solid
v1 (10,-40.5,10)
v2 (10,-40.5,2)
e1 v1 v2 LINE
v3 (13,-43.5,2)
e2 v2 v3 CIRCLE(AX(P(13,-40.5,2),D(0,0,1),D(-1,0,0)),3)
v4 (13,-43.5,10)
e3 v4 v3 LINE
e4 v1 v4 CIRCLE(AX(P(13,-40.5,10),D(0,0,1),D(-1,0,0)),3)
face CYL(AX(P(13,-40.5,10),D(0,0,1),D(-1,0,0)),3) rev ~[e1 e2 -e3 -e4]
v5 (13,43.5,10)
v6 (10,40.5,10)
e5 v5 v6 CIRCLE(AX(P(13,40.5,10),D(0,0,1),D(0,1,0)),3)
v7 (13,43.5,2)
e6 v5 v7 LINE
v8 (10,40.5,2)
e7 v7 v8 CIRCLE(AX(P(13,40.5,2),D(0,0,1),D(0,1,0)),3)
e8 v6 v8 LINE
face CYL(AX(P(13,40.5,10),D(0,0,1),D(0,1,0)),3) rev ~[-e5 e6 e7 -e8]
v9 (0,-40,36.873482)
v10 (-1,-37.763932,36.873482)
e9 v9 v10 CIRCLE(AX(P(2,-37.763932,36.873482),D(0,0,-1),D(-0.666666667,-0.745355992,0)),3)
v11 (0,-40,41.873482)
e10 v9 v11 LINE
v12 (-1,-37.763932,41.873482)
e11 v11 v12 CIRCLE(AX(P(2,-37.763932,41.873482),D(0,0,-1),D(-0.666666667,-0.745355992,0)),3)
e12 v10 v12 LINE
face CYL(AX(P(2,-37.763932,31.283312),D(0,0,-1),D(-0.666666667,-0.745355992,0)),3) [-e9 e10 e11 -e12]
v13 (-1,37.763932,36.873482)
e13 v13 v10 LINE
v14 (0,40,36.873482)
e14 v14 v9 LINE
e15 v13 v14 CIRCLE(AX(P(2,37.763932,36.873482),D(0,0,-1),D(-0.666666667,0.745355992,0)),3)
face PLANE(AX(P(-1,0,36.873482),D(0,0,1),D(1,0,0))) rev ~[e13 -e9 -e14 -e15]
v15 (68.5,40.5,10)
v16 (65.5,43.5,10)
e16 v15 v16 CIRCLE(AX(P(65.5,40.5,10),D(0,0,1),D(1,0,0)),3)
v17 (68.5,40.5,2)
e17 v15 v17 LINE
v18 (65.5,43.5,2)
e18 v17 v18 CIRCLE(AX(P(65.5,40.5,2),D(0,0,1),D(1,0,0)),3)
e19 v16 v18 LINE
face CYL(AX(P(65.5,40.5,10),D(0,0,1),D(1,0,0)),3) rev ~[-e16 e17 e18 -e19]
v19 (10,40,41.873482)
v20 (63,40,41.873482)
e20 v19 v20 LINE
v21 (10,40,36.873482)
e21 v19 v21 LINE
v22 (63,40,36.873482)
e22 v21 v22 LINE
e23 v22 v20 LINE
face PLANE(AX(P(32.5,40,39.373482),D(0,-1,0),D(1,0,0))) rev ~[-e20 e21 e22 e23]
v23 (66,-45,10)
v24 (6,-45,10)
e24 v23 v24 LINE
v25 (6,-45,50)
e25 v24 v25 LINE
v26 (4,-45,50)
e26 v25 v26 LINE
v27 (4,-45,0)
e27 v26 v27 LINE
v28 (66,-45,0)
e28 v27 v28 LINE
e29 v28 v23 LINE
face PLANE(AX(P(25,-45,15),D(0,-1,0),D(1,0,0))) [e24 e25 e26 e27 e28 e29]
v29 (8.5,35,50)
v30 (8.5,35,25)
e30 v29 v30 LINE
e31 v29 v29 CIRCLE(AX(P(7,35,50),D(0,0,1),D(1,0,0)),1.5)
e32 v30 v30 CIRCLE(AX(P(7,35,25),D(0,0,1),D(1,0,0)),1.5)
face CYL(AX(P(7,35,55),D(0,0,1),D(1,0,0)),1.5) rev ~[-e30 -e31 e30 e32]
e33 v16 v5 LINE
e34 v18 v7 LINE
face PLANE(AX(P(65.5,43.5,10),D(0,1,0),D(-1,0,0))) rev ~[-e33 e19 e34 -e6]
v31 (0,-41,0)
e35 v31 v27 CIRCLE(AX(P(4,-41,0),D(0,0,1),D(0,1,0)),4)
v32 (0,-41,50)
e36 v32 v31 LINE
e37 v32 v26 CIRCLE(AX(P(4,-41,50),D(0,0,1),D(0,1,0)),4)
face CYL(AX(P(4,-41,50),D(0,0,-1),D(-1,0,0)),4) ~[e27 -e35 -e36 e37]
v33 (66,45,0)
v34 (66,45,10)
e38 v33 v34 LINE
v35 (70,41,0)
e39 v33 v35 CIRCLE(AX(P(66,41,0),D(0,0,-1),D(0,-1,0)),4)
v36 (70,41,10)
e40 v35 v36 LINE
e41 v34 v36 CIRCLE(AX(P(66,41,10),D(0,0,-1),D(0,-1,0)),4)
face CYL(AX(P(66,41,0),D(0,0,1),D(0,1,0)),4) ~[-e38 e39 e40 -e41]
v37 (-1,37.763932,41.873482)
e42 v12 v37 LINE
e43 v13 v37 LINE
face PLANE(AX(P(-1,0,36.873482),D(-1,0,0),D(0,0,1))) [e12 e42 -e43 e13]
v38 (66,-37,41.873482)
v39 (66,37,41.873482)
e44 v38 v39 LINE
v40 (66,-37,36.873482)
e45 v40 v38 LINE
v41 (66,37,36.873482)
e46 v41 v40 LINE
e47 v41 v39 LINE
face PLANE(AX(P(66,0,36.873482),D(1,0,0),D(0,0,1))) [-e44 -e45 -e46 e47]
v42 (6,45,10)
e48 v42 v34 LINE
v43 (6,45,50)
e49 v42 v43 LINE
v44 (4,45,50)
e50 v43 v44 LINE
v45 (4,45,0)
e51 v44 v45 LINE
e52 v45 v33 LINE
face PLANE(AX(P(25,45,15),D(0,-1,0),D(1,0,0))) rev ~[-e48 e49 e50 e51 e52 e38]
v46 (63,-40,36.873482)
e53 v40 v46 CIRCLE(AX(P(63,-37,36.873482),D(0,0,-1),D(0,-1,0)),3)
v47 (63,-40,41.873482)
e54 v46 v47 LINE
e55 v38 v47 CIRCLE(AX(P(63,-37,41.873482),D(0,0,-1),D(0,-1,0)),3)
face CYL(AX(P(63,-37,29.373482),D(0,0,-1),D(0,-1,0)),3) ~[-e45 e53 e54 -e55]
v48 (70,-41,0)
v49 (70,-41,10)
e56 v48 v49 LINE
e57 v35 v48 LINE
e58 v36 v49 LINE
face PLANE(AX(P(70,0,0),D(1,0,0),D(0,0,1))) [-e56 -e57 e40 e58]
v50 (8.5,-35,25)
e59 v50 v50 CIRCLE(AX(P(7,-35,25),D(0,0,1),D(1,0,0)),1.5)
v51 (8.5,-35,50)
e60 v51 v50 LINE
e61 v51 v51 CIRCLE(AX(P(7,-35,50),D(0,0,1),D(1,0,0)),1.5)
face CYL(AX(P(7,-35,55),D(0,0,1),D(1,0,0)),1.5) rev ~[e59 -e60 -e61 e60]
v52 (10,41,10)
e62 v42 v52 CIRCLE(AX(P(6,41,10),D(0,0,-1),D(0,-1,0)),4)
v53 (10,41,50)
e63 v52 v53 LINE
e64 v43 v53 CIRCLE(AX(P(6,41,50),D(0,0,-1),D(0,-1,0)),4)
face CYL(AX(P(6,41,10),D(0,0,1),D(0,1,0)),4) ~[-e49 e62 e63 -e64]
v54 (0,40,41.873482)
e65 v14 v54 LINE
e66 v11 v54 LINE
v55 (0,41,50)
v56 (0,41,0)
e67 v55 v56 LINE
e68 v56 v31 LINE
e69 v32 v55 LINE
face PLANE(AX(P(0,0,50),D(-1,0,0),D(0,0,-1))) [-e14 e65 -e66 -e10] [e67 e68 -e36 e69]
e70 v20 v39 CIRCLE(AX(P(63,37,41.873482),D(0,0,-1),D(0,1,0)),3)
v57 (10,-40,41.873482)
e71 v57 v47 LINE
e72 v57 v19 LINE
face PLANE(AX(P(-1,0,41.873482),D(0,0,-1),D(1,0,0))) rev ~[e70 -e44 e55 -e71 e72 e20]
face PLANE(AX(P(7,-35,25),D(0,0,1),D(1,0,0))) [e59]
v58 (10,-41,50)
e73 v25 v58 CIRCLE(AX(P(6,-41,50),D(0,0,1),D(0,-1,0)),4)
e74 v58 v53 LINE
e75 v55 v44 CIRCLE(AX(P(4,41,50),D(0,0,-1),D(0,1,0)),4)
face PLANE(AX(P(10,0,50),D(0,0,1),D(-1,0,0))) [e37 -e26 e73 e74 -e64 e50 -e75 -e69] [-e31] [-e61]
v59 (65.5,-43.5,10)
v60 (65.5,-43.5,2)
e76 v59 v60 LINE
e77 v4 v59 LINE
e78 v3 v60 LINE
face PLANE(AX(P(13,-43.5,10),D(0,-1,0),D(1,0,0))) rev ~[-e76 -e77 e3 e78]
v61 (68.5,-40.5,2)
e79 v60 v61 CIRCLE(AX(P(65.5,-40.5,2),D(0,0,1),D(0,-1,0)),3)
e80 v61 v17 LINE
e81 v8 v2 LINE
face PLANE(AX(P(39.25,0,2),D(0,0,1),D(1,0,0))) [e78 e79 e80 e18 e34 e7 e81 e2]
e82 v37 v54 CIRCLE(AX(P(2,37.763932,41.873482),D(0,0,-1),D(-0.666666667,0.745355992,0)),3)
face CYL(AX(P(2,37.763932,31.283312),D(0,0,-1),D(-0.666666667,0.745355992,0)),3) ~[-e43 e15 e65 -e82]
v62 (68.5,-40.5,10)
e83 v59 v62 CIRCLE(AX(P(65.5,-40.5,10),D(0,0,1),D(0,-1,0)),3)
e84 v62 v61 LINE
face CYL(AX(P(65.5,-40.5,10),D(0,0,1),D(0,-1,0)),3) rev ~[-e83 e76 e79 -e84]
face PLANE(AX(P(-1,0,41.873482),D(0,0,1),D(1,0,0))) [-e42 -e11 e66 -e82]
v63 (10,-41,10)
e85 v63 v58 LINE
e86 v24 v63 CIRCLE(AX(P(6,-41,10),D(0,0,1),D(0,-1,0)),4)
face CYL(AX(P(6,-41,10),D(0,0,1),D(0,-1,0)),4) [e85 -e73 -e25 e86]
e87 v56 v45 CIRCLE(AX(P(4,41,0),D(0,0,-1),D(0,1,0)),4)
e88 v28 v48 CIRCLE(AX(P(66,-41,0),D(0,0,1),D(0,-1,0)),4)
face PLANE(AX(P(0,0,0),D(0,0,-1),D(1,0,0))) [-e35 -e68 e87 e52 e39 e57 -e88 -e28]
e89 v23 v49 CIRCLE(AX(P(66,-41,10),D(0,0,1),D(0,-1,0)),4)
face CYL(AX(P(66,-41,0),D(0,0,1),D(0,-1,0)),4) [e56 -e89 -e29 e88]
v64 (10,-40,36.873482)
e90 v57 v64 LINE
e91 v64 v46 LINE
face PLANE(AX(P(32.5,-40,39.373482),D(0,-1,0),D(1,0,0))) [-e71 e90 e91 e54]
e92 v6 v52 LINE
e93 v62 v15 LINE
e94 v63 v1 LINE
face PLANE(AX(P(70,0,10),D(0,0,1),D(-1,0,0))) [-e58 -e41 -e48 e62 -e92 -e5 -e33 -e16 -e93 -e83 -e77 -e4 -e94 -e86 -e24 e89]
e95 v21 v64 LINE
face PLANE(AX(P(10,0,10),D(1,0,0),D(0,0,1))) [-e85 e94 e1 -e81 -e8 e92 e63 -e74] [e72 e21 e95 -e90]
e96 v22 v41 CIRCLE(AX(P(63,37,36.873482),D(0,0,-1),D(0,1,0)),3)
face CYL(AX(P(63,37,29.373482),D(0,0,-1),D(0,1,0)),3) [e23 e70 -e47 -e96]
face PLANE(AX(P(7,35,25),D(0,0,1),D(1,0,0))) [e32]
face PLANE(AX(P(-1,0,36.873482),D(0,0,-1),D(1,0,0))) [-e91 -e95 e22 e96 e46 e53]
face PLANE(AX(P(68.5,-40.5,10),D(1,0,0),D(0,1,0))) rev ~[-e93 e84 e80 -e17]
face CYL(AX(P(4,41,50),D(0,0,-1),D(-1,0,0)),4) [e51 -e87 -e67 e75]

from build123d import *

# Parameters (mm, degrees)
F1_DEPTH      = 45
F1_DEPTH_BACK = 45
F2_W          = 67
F2_H          = 5
F3_DEPTH      = 40
F3_DEPTH_BACK = 40
F5_R          = 1.5
F6_DEPTH      = 30
F8_DEPTH      = 8
F9_R          = 4
F10_T1_DEPTH  = 20
F10_T3_DEPTH  = 16.1803398875


# Not quite as in the source:
# - a fillet or chamfer that OpenCascade refuses, or shapes differently, is made with other operations: its cross-section is extruded or revolved along the edge and cut away or added


with BuildPart() as f1:
    # F0 (on Front) → F1 (new body, two sides)
    with BuildSketch(Plane.XZ) as f1_sk:
        Polygon((0, 50), (0, 0), (70, 0), (70, 10), (10, 10), (10, 50), align=None)
    extrude(amount=F1_DEPTH)
    extrude(f1_sk.sketch, amount=-F1_DEPTH_BACK)

    # F2 (on Front) → F3 (join, two sides)
    with BuildSketch(Plane.XZ) as f3_sk:
        with Locations((32.5, 39.3734816462)):
            Rectangle(F2_W, F2_H)
    extrude(amount=-F3_DEPTH)
    extrude(f3_sk.sketch, amount=F3_DEPTH_BACK)

    # F5 (on offset) → F6 (cut)
    with BuildSketch(Plane.XY.offset(55)):
        with Locations((7, -35)):
            Circle(F5_R)
        with Locations((7, 35)):
            Circle(F5_R)
    extrude(amount=-F6_DEPTH, mode=Mode.SUBTRACT)

    # F7 (on face) → F8 (cut)
    with BuildSketch(Plane.XY.offset(10)):
        with BuildLine():
            ThreePointArc((68.5, 40.5), (67.6213203436, 42.6213203436), (65.5, 43.5))
            Line((65.5, 43.5), (13, 43.5))
            ThreePointArc((13, 43.5), (10.8786796564, 42.6213203436), (10, 40.5))
            Line((10, 40.5), (10, -40.5))
            ThreePointArc((10, -40.5), (10.8786796564, -42.6213203436), (13, -43.5))
            Line((13, -43.5), (65.5, -43.5))
            ThreePointArc((65.5, -43.5), (67.6213203436, -42.6213203436), (68.5, -40.5))
            Line((68.5, -40.5), (68.5, 40.5))
        make_face()
    extrude(amount=-F8_DEPTH, mode=Mode.SUBTRACT)

    # F9
    f9_edges = [f1.edges().sort_by_distance(p)[0] for p in [
        (70, -45, 5),
        (70, 45, 5),
        (0, -45, 25),
        (0, 45, 25),
        (10, -45, 30),
        (10, 45, 30),
    ]]
    fillet(f9_edges, radius=F9_R)

    # F10: fillet of radius 3 on 4 edges, made by hand

    # F10_s2 → F10_t1 (cut)
    with BuildSketch(Plane.XY.offset(29.3734816462)):
        with BuildLine():
            ThreePointArc((63, -40), (65.1213203436, -39.1213203436), (66, -37))
            Line((66, -37), (66, -40))
            Line((66, -40), (63, -40))
        make_face()
        with BuildLine():
            ThreePointArc((63, 40), (65.1213203436, 39.1213203436), (66, 37))
            Line((66, 37), (66, 40))
            Line((66, 40), (63, 40))
        make_face()
    extrude(amount=F10_T1_DEPTH, mode=Mode.SUBTRACT)

    # F10_s4 → F10_t3 (cut)
    with BuildSketch(Plane.XY.offset(31.2833117024)):
        with BuildLine():
            ThreePointArc((0, 40), (-0.7386127875, 38.9886768939), (-1, 37.7639320225))
            Line((-1, 37.7639320225), (-1, 40))
            Line((-1, 40), (0, 40))
        make_face()
        with BuildLine():
            ThreePointArc((0, -40), (-0.7386127875, -38.9886768939), (-1, -37.7639320225))
            Line((-1, -37.7639320225), (-1, -40))
            Line((-1, -40), (0, -40))
        make_face()
    extrude(amount=F10_T3_DEPTH, mode=Mode.SUBTRACT)


solid = f1.part
